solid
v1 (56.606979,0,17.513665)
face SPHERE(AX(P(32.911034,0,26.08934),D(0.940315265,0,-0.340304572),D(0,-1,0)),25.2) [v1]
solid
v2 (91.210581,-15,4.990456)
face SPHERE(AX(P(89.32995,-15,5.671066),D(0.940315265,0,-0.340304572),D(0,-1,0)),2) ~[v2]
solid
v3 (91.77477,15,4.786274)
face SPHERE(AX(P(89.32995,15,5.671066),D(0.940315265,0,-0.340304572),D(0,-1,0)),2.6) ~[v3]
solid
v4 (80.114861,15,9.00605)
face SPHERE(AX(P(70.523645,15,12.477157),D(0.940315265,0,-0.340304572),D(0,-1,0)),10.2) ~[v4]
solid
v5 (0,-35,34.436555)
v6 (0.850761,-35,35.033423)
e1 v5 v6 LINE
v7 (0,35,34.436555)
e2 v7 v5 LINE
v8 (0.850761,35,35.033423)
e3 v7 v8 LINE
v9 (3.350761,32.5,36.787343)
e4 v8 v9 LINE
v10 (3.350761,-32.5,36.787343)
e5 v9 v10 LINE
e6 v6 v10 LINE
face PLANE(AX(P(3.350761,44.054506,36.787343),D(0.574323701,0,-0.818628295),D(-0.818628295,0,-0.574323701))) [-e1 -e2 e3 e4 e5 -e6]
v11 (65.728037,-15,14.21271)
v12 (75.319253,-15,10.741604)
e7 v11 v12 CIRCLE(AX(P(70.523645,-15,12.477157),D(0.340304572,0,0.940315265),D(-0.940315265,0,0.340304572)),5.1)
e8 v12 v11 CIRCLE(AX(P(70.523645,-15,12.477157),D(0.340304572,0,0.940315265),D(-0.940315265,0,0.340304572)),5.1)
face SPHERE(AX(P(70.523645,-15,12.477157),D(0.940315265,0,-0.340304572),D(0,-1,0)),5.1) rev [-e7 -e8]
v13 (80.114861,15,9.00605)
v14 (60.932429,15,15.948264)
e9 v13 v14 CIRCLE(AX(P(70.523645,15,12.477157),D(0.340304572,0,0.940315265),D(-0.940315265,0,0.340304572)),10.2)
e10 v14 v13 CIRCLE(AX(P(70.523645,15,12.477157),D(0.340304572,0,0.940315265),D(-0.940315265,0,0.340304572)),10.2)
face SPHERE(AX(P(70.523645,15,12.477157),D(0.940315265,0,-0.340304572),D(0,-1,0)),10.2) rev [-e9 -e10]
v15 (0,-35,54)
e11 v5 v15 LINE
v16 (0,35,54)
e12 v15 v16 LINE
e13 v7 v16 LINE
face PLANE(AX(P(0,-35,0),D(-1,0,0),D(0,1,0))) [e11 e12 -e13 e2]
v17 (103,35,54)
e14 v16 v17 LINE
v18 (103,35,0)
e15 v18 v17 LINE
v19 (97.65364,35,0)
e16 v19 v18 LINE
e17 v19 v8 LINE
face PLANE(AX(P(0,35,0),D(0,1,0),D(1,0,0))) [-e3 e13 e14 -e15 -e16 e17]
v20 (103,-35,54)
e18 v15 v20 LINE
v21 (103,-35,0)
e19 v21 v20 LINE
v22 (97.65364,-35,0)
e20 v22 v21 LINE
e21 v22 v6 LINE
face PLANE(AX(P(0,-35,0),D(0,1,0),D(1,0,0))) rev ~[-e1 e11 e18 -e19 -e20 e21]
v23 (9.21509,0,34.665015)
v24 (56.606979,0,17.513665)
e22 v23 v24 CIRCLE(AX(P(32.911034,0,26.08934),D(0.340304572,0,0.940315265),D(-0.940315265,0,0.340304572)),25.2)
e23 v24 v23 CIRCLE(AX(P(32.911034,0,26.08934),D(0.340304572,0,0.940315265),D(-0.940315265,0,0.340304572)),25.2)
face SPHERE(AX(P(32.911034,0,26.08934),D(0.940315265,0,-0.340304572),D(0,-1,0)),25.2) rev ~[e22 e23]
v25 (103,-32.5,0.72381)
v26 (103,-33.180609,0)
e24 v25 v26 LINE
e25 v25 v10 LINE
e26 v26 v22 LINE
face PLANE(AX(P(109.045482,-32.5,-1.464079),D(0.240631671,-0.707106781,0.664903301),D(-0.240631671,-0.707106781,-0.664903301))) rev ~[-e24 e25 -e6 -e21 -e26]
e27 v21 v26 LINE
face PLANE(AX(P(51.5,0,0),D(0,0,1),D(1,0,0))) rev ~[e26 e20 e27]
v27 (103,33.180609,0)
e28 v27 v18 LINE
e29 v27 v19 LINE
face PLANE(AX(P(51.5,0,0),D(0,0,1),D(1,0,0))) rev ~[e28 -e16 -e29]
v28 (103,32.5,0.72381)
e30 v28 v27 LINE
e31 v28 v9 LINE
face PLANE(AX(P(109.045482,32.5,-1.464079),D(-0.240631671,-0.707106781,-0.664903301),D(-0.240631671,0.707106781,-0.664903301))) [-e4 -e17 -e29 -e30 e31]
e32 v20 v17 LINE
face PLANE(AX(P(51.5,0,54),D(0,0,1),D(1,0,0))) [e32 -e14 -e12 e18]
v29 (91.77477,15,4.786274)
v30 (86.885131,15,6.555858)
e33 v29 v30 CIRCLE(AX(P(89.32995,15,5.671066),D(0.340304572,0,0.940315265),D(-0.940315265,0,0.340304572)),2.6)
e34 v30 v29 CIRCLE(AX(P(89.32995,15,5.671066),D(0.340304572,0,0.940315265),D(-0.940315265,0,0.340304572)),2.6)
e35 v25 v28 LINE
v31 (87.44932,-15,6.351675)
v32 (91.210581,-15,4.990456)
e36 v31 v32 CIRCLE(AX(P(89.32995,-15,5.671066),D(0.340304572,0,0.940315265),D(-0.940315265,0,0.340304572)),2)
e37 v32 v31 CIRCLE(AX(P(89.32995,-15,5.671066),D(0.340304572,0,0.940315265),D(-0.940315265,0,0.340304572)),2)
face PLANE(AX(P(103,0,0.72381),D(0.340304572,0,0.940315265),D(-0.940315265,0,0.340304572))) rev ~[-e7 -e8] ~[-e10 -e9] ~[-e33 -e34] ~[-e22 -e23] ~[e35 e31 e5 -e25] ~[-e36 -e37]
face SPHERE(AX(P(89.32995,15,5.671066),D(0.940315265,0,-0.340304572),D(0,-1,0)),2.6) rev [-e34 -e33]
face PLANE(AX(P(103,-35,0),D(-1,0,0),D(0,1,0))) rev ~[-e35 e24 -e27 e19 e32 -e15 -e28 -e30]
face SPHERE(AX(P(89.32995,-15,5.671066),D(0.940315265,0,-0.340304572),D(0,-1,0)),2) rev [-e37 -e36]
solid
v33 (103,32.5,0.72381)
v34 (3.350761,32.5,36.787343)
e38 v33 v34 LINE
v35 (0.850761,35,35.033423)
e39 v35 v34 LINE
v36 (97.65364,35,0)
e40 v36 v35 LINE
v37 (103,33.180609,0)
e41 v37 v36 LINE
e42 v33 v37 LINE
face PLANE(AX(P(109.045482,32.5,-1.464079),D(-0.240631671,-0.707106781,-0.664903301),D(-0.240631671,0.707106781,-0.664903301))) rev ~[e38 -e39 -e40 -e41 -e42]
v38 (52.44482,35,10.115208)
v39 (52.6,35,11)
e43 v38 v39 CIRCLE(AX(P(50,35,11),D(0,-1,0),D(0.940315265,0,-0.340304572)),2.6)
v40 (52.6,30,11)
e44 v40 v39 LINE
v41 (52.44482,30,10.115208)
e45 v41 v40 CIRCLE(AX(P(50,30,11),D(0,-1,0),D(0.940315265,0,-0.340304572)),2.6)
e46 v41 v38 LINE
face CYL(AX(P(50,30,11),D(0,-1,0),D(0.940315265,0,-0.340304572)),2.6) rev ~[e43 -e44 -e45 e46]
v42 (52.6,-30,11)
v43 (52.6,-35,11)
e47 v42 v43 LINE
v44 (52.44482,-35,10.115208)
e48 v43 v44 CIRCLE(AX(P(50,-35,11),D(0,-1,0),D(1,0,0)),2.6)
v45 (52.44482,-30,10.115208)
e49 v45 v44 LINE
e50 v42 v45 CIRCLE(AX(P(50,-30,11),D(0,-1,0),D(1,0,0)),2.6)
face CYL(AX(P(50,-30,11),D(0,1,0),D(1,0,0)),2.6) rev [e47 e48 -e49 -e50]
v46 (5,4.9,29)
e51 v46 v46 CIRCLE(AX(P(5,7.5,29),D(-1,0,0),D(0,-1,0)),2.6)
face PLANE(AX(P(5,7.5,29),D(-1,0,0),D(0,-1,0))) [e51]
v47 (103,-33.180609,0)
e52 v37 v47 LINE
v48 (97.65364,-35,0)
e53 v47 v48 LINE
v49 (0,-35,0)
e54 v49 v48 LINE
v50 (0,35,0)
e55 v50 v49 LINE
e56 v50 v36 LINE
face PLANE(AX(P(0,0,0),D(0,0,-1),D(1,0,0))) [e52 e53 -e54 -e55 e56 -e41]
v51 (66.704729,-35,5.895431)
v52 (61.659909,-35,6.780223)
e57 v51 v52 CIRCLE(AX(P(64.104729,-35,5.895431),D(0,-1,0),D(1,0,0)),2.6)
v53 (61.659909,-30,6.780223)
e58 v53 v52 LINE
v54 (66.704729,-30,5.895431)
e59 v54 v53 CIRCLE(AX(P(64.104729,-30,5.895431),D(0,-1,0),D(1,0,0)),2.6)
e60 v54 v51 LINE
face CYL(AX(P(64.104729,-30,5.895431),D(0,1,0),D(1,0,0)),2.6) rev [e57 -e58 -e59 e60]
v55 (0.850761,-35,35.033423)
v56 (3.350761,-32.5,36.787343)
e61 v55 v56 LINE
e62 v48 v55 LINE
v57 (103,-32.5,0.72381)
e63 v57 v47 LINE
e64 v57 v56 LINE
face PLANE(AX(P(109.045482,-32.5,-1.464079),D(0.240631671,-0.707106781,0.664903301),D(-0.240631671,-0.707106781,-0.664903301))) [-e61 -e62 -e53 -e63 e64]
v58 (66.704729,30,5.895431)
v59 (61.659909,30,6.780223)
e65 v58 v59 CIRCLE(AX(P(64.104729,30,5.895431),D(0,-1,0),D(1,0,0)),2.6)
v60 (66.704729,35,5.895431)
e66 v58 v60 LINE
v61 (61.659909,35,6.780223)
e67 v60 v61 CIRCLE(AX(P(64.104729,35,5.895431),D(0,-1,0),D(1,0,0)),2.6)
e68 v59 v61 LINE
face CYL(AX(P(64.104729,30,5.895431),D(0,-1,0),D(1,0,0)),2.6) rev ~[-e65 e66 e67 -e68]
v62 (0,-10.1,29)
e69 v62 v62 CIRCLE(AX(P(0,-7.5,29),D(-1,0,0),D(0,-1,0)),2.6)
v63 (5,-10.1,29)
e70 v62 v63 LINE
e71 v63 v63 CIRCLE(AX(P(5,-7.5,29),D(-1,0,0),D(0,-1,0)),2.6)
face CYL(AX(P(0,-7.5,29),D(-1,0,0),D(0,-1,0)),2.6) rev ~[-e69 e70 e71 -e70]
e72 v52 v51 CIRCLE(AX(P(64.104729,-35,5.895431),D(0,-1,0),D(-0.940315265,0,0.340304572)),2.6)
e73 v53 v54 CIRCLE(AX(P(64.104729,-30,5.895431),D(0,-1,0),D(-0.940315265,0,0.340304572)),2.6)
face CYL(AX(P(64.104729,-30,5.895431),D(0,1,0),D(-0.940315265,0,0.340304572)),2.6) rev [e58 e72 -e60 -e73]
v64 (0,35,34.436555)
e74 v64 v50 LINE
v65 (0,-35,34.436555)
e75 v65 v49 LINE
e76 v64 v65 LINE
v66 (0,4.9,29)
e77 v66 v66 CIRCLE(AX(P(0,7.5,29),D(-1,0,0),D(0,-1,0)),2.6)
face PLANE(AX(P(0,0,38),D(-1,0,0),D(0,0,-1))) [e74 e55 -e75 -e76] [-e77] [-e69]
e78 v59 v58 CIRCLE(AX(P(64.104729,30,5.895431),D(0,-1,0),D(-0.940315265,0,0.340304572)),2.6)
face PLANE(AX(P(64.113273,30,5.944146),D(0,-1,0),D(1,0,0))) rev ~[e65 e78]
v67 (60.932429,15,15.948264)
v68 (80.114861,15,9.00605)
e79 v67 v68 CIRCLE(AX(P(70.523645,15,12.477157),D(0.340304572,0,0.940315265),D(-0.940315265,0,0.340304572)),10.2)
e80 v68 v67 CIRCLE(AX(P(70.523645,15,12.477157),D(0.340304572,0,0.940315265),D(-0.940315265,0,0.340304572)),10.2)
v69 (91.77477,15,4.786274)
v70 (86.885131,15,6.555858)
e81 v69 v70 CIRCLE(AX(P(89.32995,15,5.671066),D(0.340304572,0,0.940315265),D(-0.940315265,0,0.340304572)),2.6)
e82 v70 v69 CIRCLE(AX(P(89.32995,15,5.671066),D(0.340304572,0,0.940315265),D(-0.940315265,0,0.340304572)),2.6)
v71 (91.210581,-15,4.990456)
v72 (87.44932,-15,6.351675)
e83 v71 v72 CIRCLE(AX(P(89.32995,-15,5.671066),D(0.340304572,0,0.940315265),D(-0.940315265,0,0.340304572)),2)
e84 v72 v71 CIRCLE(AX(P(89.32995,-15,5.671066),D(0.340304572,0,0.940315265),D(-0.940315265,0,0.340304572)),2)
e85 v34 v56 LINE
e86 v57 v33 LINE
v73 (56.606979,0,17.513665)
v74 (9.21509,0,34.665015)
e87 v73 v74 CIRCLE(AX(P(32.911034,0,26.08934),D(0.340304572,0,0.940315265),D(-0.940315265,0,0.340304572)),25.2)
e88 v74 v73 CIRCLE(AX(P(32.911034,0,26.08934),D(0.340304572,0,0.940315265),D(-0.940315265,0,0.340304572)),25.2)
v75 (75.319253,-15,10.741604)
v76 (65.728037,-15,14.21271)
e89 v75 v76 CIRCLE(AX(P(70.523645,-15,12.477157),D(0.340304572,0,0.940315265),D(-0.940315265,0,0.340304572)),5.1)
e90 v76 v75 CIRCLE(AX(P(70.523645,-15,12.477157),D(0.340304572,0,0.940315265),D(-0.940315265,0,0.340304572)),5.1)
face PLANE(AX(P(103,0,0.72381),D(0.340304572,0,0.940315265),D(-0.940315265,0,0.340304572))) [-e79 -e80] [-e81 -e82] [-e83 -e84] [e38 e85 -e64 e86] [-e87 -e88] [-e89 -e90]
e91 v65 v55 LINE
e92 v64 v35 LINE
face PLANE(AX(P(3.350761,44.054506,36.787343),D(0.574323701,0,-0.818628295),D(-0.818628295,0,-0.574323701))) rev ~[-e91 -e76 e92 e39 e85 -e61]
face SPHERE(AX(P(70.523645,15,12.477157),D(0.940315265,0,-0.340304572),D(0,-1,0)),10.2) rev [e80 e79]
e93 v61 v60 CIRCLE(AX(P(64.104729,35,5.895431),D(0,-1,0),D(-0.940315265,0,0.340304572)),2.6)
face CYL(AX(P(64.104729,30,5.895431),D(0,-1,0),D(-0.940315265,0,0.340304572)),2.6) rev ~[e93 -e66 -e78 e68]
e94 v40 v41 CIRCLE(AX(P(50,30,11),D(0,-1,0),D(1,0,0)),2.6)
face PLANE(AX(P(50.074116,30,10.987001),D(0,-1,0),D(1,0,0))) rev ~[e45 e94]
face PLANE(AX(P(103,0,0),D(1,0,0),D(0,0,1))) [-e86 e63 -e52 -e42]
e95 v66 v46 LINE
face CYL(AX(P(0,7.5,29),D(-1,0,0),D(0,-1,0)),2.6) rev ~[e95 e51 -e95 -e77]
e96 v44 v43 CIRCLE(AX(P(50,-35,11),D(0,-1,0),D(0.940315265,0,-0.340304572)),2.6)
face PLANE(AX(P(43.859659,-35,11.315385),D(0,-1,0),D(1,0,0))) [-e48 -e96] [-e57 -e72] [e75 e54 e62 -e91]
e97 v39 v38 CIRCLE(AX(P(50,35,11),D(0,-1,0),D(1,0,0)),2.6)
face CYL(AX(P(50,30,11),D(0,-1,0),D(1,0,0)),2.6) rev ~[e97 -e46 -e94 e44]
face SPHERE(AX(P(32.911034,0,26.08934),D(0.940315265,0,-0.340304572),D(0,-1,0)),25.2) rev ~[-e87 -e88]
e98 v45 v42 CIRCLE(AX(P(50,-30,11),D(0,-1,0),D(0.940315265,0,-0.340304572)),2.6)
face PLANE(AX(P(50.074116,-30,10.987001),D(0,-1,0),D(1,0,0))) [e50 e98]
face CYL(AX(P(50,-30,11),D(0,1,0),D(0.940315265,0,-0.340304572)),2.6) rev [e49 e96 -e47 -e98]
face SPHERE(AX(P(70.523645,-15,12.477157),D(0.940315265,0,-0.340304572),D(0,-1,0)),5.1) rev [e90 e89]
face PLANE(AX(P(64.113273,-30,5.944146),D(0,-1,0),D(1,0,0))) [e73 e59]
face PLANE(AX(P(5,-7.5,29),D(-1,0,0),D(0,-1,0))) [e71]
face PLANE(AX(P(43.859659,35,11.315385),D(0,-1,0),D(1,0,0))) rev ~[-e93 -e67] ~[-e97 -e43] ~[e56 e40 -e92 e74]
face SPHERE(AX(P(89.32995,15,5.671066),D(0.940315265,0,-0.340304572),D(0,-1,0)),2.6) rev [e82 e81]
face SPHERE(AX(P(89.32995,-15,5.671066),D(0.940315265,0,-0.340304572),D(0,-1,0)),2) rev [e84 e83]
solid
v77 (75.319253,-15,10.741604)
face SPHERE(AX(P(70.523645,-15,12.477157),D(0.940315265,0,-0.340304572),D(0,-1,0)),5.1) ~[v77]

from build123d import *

# Parameters (mm, degrees)
F1_DEPTH      = 35
F1_DEPTH_BACK = 35
F14_W         = 103
F14_H         = 70
F15_DEPTH     = 54
F16_T1_DEPTH  = 122.3961453181
F16_T3_DEPTH  = 88.1090116667
F19_START     = 30
F19_DEPTH     = 5
F20_START     = -30
F20_DEPTH     = 5
F21_R         = 2.6
F22_DEPTH     = 5


# Not quite as in the source:
# - a fillet or chamfer that OpenCascade refuses, or shapes differently, is made with other operations: its cross-section is extruded or revolved along the edge and cut away or added
# - a feature names something its author has since deleted; it is built from what else it names


with BuildPart() as f1:
    # F0 (on Front) → F1 (new body, two sides)
    with BuildSketch(Plane.XZ) as f1_sk:
        Polygon((0, 38), (0, 0), (103, 0), (103, 0.7238095238), align=None)
    extrude(amount=F1_DEPTH)
    extrude(f1_sk.sketch, amount=-F1_DEPTH_BACK)

    # F3 (on offset) → F4 (revolve, cut)
    with BuildSketch(Plane(origin=(12.1597561954, 0, 33.5993263293), x_dir=(0.9403152653, 0, -0.3403045722), z_dir=(0.3403045722, 0, 0.9403152653))):
        with BuildLine():
            ThreePointArc((-3.1315737436, 0), (22.0684262564, -25.2), (47.2684262564, 0))
            Line((47.2684262564, 0), (-3.1315737436, 0))
        make_face()
    revolve(axis=Axis((32.9110342852, 0, 26.089339973), (0.9403152653, 0, -0.3403045722)), mode=Mode.SUBTRACT)

    # F3 (on offset) → F5 (revolve, cut)
    with BuildSketch(Plane(origin=(12.1597561954, 0, 33.5993263293), x_dir=(0.9403152653, 0, -0.3403045722), z_dir=(0.3403045722, 0, 0.9403152653))):
        with BuildLine():
            ThreePointArc((56.9684262564, -15), (62.0684262564, -20.1), (67.1684262564, -15))
            Line((67.1684262564, -15), (62.0684262564, -15))
            Line((62.0684262564, -15), (56.9684262564, -15))
        make_face()
    revolve(axis=Axis((68.1258409703, -15, 13.3449337441), (-0.9403152653, 0, 0.3403045722)), mode=Mode.SUBTRACT)

    # F3 (on offset) → F6 (revolve, cut)
    with BuildSketch(Plane(origin=(12.1597561954, 0, 33.5993263293), x_dir=(0.9403152653, 0, -0.3403045722), z_dir=(0.3403045722, 0, 0.9403152653))):
        with BuildLine():
            ThreePointArc((51.8684262564, 15), (62.0684262564, 4.8), (72.2684262564, 15))
            Line((72.2684262564, 15), (62.0684262564, 15))
            Line((62.0684262564, 15), (51.8684262564, 15))
        make_face()
    revolve(axis=Axis((65.7280370438, 15, 14.2127104032), (-0.9403152653, 0, 0.3403045722)), mode=Mode.SUBTRACT)

    # F3 (on offset) → F7 (revolve, cut)
    with BuildSketch(Plane(origin=(12.1597561954, 0, 33.5993263293), x_dir=(0.9403152653, 0, -0.3403045722), z_dir=(0.3403045722, 0, 0.9403152653))):
        with BuildLine():
            ThreePointArc((80.0684262564, -15), (82.0684262564, -17), (84.0684262564, -15))
            Line((84.0684262564, -15), (82.0684262564, -15))
            Line((82.0684262564, -15), (80.0684262564, -15))
        make_face()
    revolve(axis=Axis((88.3896349374, -15, 6.0113702131), (-0.9403152653, 0, 0.3403045722)), mode=Mode.SUBTRACT)

    # F3 (on offset) → F8 (revolve, cut)
    with BuildSketch(Plane(origin=(12.1597561954, 0, 33.5993263293), x_dir=(0.9403152653, 0, -0.3403045722), z_dir=(0.3403045722, 0, 0.9403152653))):
        with BuildLine():
            ThreePointArc((79.4684262564, 15), (82.0684262564, 12.4), (84.6684262564, 15))
            Line((84.6684262564, 15), (82.0684262564, 15))
            Line((82.0684262564, 15), (79.4684262564, 15))
        make_face()
    revolve(axis=Axis((88.1075403578, 15, 6.1134615848), (-0.9403152653, 0, 0.3403045722)), mode=Mode.SUBTRACT)

    # F16: chamfer of 2.5 on 3 edges, made by hand

    # F16_s2 → F16_t1 (cut)
    with BuildSketch(Plane(origin=(96.8857257323, 0, -35.0634055031), x_dir=(0, 1, 0), z_dir=(-0.9403152653, 0, 0.3403045722))):
        Polygon((-32.5, -35.7319800811), (-35, -33.2319800811), (-35, -35.7319800811), align=None)
        Polygon((32.5, -35.7319800811), (35, -33.2319800811), (35, -35.7319800811), align=None)
    extrude(amount=F16_T1_DEPTH, mode=Mode.SUBTRACT)

    # F16_s4 → F16_t3 (cut)
    with BuildSketch(Plane.XZ.offset(-44.0545058334)):
        Polygon((3.3507614305, 36.7873434823), (0, 34.4365553191), (0, 38), align=None)
    extrude(amount=F16_T3_DEPTH, mode=Mode.SUBTRACT)


with BuildPart() as f9:
    # F3 (on offset) → F9 (revolve)
    with BuildSketch(Plane(origin=(12.1597561954, 0, 33.5993263293), x_dir=(0.9403152653, 0, -0.3403045722), z_dir=(0.3403045722, 0, 0.9403152653))):
        with BuildLine():
            ThreePointArc((-3.1315737436, 0), (22.0684262564, -25.2), (47.2684262564, 0))
            Line((47.2684262564, 0), (-3.1315737436, 0))
        make_face()
    revolve(axis=Axis((32.9110342852, 0, 26.089339973), (0.9403152653, 0, -0.3403045722)))


with BuildPart() as f10:
    # F3 (on offset) → F10 (revolve)
    with BuildSketch(Plane(origin=(12.1597561954, 0, 33.5993263293), x_dir=(0.9403152653, 0, -0.3403045722), z_dir=(0.3403045722, 0, 0.9403152653))):
        with BuildLine():
            ThreePointArc((51.8684262564, 15), (62.0684262564, 4.8), (72.2684262564, 15))
            Line((72.2684262564, 15), (62.0684262564, 15))
            Line((62.0684262564, 15), (51.8684262564, 15))
        make_face()
    revolve(axis=Axis((65.7280370438, 15, 14.2127104032), (-0.9403152653, 0, 0.3403045722)))


with BuildPart() as f11:
    # F3 (on offset) → F11 (revolve)
    with BuildSketch(Plane(origin=(12.1597561954, 0, 33.5993263293), x_dir=(0.9403152653, 0, -0.3403045722), z_dir=(0.3403045722, 0, 0.9403152653))):
        with BuildLine():
            ThreePointArc((56.9684262564, -15), (62.0684262564, -20.1), (67.1684262564, -15))
            Line((67.1684262564, -15), (62.0684262564, -15))
            Line((62.0684262564, -15), (56.9684262564, -15))
        make_face()
    revolve(axis=Axis((68.1258409703, -15, 13.3449337441), (-0.9403152653, 0, 0.3403045722)))


with BuildPart() as f12:
    # F3 (on offset) → F12 (revolve)
    with BuildSketch(Plane(origin=(12.1597561954, 0, 33.5993263293), x_dir=(0.9403152653, 0, -0.3403045722), z_dir=(0.3403045722, 0, 0.9403152653))):
        with BuildLine():
            ThreePointArc((79.4684262564, 15), (82.0684262564, 12.4), (84.6684262564, 15))
            Line((84.6684262564, 15), (82.0684262564, 15))
            Line((82.0684262564, 15), (79.4684262564, 15))
        make_face()
    revolve(axis=Axis((88.1075403578, 15, 6.1134615848), (-0.9403152653, 0, 0.3403045722)))


with BuildPart() as f13:
    # F3 (on offset) → F13 (revolve)
    with BuildSketch(Plane(origin=(12.1597561954, 0, 33.5993263293), x_dir=(0.9403152653, 0, -0.3403045722), z_dir=(0.3403045722, 0, 0.9403152653))):
        with BuildLine():
            ThreePointArc((80.0684262564, -15), (82.0684262564, -17), (84.0684262564, -15))
            Line((84.0684262564, -15), (82.0684262564, -15))
            Line((82.0684262564, -15), (80.0684262564, -15))
        make_face()
    revolve(axis=Axis((88.3896349374, -15, 6.0113702131), (-0.9403152653, 0, 0.3403045722)))


with BuildPart() as f15:
    # F14 (on Top) → F15 (new body)
    with BuildSketch(Plane.XY):
        with Locations((51.5, 0)):
            Rectangle(F14_W, F14_H)
    extrude(amount=F15_DEPTH)

    # F17: cut F13, F12, F11, F10, F9, F1
    add(f13.part, mode=Mode.SUBTRACT)
    add(f12.part, mode=Mode.SUBTRACT)
    add(f11.part, mode=Mode.SUBTRACT)
    add(f10.part, mode=Mode.SUBTRACT)
    add(f9.part, mode=Mode.SUBTRACT)
    add(f1.part, mode=Mode.SUBTRACT)


with BuildPart() as f1_1:
    add(f1.part)

    # F18 (on Front) → F19 (cut)
    with BuildSketch(Plane.XZ.offset(F19_START)):
        with BuildLine():
            ThreePointArc((52.4448196898, 10.1152081123), (52.5609110872, 10.5508514685), (52.6, 11))
            ThreePointArc((52.6, 11), (47.4390889128, 11.4491485315), (52.4448196898, 10.1152081123))
        make_face()
        with BuildLine():
            ThreePointArc((66.7047289794, 5.895431417), (64.5538775108, 8.4563425042), (61.6599092896, 6.7802233047))
            ThreePointArc((61.6599092896, 6.7802233047), (63.6555804479, 3.3345203298), (66.7047289794, 5.895431417))
        make_face()
    extrude(amount=F19_DEPTH, mode=Mode.SUBTRACT)

    # F18 (on Front) → F20 (cut)
    with BuildSketch(Plane.XZ.offset(F20_START)):
        with BuildLine():
            ThreePointArc((52.4448196898, 10.1152081123), (52.5609110872, 10.5508514685), (52.6, 11))
            ThreePointArc((52.6, 11), (47.4390889128, 11.4491485315), (52.4448196898, 10.1152081123))
        make_face()
        with BuildLine():
            ThreePointArc((66.7047289794, 5.895431417), (64.5538775108, 8.4563425042), (61.6599092896, 6.7802233047))
            ThreePointArc((61.6599092896, 6.7802233047), (63.6555804479, 3.3345203298), (66.7047289794, 5.895431417))
        make_face()
    extrude(amount=-F20_DEPTH, mode=Mode.SUBTRACT)

    # F21 (on face) → F22 (cut)
    with BuildSketch(Plane(origin=(0, 0, 0), x_dir=(0, -1, 0), z_dir=(-1, 0, 0))):
        with Locations((-7.5, 29)):
            Circle(F21_R)
        with Locations((7.5, 29)):
            Circle(F21_R)
    extrude(amount=-F22_DEPTH, mode=Mode.SUBTRACT)


solid = Compound([f9.part, f10.part, f11.part, f12.part, f13.part, f15.part, f1_1.part])
